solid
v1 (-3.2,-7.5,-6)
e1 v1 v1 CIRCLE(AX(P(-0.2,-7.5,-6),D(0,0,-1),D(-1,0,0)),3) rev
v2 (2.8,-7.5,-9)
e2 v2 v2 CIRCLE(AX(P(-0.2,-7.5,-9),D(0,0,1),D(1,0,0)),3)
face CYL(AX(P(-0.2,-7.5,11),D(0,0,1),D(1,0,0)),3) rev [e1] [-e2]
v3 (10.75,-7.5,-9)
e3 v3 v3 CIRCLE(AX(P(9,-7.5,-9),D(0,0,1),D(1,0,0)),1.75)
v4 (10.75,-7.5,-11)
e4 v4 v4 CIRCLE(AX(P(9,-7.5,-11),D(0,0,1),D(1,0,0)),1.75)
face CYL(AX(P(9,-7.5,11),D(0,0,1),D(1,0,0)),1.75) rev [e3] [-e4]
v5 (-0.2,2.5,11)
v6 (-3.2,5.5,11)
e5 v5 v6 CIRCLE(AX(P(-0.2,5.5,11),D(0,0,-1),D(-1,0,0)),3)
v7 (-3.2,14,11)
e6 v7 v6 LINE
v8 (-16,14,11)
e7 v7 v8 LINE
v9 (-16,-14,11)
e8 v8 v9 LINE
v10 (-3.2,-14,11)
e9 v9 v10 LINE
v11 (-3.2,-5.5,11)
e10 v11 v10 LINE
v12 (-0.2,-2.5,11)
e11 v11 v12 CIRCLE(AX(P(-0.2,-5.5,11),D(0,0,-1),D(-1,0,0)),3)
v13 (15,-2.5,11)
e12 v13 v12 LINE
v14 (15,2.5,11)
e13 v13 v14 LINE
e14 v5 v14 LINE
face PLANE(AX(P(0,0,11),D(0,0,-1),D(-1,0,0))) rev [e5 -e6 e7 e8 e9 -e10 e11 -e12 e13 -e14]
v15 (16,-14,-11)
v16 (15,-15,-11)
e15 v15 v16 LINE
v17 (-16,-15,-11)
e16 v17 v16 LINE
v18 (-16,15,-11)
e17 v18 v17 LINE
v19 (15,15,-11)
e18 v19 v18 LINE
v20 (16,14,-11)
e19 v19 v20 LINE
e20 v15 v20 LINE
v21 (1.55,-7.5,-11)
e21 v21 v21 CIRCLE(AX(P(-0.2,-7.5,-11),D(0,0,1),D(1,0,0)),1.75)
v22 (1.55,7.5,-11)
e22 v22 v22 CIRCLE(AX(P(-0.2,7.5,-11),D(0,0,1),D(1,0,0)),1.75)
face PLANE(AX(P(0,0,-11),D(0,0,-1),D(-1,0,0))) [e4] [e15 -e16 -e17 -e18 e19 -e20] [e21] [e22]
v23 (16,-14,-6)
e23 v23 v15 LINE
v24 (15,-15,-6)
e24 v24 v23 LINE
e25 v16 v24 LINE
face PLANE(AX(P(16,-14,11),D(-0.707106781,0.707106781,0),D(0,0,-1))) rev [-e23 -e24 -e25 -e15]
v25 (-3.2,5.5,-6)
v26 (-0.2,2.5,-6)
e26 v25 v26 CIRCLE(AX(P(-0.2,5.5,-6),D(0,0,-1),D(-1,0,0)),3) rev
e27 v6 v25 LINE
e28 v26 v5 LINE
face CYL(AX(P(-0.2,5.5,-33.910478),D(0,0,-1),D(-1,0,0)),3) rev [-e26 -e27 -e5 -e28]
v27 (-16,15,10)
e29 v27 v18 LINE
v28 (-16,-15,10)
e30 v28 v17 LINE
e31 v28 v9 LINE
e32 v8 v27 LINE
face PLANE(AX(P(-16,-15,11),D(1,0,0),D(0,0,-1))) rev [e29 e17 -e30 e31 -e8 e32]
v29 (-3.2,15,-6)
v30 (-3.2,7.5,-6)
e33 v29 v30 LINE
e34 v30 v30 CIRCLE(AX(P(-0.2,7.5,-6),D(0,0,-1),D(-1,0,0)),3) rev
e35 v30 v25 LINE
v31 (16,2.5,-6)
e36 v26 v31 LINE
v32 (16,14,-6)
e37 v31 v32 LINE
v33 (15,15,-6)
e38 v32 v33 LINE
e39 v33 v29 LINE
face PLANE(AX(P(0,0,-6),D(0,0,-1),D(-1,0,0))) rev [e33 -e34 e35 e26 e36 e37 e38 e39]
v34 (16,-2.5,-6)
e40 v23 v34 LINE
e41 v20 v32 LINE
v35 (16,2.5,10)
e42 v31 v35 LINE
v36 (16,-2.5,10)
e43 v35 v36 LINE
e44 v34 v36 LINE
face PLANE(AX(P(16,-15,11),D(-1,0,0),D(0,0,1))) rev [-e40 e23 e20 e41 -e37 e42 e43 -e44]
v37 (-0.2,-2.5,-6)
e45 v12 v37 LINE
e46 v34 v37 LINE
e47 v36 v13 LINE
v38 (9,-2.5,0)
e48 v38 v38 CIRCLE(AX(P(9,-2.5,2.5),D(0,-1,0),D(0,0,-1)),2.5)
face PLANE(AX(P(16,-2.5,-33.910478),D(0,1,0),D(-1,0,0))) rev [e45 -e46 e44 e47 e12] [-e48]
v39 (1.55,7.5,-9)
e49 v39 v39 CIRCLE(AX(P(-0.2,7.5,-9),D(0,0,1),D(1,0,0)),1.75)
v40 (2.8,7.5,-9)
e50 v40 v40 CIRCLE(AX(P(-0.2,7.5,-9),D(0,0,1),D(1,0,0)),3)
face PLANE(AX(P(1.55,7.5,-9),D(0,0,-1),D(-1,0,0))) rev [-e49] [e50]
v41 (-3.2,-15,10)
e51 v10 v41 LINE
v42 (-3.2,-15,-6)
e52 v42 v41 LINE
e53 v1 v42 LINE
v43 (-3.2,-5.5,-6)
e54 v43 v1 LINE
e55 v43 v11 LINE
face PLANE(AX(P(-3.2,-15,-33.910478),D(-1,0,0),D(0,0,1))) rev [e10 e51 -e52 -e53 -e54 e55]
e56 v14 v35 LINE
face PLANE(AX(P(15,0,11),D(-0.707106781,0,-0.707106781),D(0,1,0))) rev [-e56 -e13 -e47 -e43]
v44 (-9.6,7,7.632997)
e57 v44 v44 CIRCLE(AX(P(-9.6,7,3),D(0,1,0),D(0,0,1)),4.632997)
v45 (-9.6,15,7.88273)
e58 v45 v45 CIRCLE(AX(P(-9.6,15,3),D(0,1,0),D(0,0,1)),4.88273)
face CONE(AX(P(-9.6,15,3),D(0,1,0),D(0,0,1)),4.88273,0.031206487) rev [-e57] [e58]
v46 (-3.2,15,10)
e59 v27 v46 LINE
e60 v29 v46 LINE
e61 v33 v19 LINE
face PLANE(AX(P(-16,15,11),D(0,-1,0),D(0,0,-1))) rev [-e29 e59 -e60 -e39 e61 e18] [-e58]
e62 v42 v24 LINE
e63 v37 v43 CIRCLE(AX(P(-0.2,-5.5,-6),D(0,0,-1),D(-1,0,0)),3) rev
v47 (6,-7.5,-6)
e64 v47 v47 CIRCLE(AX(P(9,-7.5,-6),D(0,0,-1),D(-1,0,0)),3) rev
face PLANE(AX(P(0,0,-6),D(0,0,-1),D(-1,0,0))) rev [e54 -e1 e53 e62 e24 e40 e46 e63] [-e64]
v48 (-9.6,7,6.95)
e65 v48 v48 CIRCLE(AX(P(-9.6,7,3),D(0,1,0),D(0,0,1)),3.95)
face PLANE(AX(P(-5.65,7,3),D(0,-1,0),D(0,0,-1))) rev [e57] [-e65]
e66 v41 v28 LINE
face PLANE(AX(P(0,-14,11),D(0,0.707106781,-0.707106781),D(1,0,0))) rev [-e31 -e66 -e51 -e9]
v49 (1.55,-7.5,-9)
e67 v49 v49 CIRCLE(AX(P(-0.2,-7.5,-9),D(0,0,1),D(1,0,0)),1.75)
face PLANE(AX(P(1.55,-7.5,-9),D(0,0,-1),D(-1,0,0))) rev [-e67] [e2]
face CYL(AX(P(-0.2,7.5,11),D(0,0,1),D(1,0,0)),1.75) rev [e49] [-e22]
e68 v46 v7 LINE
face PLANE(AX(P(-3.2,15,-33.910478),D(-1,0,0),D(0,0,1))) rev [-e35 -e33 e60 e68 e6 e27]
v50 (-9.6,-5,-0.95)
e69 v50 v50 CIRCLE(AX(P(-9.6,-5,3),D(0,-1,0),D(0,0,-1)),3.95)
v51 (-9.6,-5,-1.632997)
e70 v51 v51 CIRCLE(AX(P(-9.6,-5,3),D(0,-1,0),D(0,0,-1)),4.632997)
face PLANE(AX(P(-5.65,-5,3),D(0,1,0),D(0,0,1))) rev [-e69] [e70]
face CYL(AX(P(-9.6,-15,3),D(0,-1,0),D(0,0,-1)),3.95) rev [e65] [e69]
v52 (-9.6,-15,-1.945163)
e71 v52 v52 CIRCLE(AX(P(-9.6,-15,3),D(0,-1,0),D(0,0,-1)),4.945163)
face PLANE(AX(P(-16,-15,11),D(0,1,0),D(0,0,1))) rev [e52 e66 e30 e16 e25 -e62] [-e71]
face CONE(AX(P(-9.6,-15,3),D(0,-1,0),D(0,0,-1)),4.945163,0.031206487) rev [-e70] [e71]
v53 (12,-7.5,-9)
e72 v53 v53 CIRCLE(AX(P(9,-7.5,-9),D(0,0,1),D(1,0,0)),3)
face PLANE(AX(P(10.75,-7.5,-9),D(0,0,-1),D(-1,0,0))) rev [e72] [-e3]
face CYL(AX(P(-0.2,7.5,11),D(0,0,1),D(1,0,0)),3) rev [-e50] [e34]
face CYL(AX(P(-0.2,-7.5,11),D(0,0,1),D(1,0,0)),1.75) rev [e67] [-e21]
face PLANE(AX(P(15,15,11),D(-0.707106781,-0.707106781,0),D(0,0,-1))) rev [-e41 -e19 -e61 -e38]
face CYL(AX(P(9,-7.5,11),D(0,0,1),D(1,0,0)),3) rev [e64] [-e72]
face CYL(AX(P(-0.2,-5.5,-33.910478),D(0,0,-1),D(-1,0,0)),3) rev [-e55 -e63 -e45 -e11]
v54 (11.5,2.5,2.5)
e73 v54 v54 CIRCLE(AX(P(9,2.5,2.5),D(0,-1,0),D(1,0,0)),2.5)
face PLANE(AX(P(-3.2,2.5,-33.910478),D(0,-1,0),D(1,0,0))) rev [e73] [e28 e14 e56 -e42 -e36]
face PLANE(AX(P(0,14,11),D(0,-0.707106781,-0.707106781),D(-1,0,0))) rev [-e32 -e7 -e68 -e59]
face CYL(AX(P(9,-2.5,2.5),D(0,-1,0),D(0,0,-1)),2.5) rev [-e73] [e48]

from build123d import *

# Parameters (mm, degrees)
SKETCH_2_W                = 32
SKETCH_2_H                = 30
EXTRUDE_1_DEPTH           = 11
HOLE_WIZARD_1_D           = 3.5
HOLE_WIZARD_1_CBORE_D     = 6
HOLE_WIZARD_1_CBORE_DEPTH = 20
SKETCH_11_W               = 19.2
SKETCH_11_H               = 12.5
CUT_EXTRUDE_1_DEPTH       = 17
HOLE_WIZARD_M6_1_D        = 5
CHAMFER_1_SIZE            = 1
FILLET_1_R                = 3


# Read off the part's stored shape, not the designer's step: 1/8 Rc 螺纹孔1
with BuildPart() as part:
    # 草图2 → 凸台-拉伸1 (new, symmetric)
    with BuildSketch(Plane.XY):
        Rectangle(SKETCH_2_W, SKETCH_2_H)
    extrude(amount=EXTRUDE_1_DEPTH, both=True)

    # 打孔尺寸根据内六角圆柱头螺钉的类型1 (through all)
    with Locations(Plane.XY.offset(11)):
        with Locations((-0.2, 7.5), (-0.2, -7.5), (9, -7.5)):
            CounterBoreHole(HOLE_WIZARD_1_D / 2, HOLE_WIZARD_1_CBORE_D / 2, HOLE_WIZARD_1_CBORE_DEPTH)

    # 草图11 → 切除-拉伸1 (cut)
    with BuildSketch(Plane.XY.offset(11)):
        with Locations((6.4, -8.75)):
            Rectangle(SKETCH_11_W, SKETCH_11_H)
        with Locations((6.4, 8.75)):
            Rectangle(SKETCH_11_W, SKETCH_11_H)
    extrude(amount=-CUT_EXTRUDE_1_DEPTH, mode=Mode.SUBTRACT)

    # M6 螺纹孔1 (through all)
    with Locations(Plane(origin=(0, -2.5, 0), x_dir=(-1, 0, 0), z_dir=(0, -1, 0))):
        with Locations((-9, -2.5)):
            Hole(HOLE_WIZARD_M6_1_D / 2)

    # 草图9 → 1/8 Rc 螺纹孔2 (revolve, cut)
    with BuildSketch(Plane(origin=(-9.6, -15, 3), x_dir=(0, 0, -1), z_dir=(1, 0, 0))):
        Polygon((0, 0), (0, 22.373399445), (3.95, 20), (3.95, 10), (4.632996789, 10), (4.945163, 0), align=None)
    revolve(axis=Axis((-9.6, -21.35, 3), (0, 1, 0)), mode=Mode.SUBTRACT)

    # 1/8 Rc 螺纹孔1 outline → 1/8 Rc 螺纹孔1 (revolve, cut)
    with BuildSketch(Plane(origin=(-9.6, 0, 3), x_dir=(1, 0, 0), z_dir=(0, 0, 1))):
        Polygon((4.632997031, 7), (4.88273, 15), (0, 15), (0, 7.373399445), (3.95, 5), (3.95, 7), align=None)
    revolve(axis=Axis((-9.6, 0, 3), (0, 1, 0)), mode=Mode.SUBTRACT)

    # 倒角1
    chamfer_1_edges = [part.edges().sort_by_distance(p)[0] for p in [
        (-9.6, -15, 11),
        (16, 0, 11),
        (16, -15, -8.5),
        (-9.6, 15, 11),
        (16, 15, -8.5),
    ]]
    chamfer(chamfer_1_edges, length=CHAMFER_1_SIZE)

    # 圆角1
    fillet_1_edges = [part.edges().sort_by_distance(p)[0] for p in [
        (-3.2, -2.5, 2.5),
        (-3.2, 2.5, 2.5),
    ]]
    fillet(fillet_1_edges, radius=FILLET_1_R)


solid = part.part
